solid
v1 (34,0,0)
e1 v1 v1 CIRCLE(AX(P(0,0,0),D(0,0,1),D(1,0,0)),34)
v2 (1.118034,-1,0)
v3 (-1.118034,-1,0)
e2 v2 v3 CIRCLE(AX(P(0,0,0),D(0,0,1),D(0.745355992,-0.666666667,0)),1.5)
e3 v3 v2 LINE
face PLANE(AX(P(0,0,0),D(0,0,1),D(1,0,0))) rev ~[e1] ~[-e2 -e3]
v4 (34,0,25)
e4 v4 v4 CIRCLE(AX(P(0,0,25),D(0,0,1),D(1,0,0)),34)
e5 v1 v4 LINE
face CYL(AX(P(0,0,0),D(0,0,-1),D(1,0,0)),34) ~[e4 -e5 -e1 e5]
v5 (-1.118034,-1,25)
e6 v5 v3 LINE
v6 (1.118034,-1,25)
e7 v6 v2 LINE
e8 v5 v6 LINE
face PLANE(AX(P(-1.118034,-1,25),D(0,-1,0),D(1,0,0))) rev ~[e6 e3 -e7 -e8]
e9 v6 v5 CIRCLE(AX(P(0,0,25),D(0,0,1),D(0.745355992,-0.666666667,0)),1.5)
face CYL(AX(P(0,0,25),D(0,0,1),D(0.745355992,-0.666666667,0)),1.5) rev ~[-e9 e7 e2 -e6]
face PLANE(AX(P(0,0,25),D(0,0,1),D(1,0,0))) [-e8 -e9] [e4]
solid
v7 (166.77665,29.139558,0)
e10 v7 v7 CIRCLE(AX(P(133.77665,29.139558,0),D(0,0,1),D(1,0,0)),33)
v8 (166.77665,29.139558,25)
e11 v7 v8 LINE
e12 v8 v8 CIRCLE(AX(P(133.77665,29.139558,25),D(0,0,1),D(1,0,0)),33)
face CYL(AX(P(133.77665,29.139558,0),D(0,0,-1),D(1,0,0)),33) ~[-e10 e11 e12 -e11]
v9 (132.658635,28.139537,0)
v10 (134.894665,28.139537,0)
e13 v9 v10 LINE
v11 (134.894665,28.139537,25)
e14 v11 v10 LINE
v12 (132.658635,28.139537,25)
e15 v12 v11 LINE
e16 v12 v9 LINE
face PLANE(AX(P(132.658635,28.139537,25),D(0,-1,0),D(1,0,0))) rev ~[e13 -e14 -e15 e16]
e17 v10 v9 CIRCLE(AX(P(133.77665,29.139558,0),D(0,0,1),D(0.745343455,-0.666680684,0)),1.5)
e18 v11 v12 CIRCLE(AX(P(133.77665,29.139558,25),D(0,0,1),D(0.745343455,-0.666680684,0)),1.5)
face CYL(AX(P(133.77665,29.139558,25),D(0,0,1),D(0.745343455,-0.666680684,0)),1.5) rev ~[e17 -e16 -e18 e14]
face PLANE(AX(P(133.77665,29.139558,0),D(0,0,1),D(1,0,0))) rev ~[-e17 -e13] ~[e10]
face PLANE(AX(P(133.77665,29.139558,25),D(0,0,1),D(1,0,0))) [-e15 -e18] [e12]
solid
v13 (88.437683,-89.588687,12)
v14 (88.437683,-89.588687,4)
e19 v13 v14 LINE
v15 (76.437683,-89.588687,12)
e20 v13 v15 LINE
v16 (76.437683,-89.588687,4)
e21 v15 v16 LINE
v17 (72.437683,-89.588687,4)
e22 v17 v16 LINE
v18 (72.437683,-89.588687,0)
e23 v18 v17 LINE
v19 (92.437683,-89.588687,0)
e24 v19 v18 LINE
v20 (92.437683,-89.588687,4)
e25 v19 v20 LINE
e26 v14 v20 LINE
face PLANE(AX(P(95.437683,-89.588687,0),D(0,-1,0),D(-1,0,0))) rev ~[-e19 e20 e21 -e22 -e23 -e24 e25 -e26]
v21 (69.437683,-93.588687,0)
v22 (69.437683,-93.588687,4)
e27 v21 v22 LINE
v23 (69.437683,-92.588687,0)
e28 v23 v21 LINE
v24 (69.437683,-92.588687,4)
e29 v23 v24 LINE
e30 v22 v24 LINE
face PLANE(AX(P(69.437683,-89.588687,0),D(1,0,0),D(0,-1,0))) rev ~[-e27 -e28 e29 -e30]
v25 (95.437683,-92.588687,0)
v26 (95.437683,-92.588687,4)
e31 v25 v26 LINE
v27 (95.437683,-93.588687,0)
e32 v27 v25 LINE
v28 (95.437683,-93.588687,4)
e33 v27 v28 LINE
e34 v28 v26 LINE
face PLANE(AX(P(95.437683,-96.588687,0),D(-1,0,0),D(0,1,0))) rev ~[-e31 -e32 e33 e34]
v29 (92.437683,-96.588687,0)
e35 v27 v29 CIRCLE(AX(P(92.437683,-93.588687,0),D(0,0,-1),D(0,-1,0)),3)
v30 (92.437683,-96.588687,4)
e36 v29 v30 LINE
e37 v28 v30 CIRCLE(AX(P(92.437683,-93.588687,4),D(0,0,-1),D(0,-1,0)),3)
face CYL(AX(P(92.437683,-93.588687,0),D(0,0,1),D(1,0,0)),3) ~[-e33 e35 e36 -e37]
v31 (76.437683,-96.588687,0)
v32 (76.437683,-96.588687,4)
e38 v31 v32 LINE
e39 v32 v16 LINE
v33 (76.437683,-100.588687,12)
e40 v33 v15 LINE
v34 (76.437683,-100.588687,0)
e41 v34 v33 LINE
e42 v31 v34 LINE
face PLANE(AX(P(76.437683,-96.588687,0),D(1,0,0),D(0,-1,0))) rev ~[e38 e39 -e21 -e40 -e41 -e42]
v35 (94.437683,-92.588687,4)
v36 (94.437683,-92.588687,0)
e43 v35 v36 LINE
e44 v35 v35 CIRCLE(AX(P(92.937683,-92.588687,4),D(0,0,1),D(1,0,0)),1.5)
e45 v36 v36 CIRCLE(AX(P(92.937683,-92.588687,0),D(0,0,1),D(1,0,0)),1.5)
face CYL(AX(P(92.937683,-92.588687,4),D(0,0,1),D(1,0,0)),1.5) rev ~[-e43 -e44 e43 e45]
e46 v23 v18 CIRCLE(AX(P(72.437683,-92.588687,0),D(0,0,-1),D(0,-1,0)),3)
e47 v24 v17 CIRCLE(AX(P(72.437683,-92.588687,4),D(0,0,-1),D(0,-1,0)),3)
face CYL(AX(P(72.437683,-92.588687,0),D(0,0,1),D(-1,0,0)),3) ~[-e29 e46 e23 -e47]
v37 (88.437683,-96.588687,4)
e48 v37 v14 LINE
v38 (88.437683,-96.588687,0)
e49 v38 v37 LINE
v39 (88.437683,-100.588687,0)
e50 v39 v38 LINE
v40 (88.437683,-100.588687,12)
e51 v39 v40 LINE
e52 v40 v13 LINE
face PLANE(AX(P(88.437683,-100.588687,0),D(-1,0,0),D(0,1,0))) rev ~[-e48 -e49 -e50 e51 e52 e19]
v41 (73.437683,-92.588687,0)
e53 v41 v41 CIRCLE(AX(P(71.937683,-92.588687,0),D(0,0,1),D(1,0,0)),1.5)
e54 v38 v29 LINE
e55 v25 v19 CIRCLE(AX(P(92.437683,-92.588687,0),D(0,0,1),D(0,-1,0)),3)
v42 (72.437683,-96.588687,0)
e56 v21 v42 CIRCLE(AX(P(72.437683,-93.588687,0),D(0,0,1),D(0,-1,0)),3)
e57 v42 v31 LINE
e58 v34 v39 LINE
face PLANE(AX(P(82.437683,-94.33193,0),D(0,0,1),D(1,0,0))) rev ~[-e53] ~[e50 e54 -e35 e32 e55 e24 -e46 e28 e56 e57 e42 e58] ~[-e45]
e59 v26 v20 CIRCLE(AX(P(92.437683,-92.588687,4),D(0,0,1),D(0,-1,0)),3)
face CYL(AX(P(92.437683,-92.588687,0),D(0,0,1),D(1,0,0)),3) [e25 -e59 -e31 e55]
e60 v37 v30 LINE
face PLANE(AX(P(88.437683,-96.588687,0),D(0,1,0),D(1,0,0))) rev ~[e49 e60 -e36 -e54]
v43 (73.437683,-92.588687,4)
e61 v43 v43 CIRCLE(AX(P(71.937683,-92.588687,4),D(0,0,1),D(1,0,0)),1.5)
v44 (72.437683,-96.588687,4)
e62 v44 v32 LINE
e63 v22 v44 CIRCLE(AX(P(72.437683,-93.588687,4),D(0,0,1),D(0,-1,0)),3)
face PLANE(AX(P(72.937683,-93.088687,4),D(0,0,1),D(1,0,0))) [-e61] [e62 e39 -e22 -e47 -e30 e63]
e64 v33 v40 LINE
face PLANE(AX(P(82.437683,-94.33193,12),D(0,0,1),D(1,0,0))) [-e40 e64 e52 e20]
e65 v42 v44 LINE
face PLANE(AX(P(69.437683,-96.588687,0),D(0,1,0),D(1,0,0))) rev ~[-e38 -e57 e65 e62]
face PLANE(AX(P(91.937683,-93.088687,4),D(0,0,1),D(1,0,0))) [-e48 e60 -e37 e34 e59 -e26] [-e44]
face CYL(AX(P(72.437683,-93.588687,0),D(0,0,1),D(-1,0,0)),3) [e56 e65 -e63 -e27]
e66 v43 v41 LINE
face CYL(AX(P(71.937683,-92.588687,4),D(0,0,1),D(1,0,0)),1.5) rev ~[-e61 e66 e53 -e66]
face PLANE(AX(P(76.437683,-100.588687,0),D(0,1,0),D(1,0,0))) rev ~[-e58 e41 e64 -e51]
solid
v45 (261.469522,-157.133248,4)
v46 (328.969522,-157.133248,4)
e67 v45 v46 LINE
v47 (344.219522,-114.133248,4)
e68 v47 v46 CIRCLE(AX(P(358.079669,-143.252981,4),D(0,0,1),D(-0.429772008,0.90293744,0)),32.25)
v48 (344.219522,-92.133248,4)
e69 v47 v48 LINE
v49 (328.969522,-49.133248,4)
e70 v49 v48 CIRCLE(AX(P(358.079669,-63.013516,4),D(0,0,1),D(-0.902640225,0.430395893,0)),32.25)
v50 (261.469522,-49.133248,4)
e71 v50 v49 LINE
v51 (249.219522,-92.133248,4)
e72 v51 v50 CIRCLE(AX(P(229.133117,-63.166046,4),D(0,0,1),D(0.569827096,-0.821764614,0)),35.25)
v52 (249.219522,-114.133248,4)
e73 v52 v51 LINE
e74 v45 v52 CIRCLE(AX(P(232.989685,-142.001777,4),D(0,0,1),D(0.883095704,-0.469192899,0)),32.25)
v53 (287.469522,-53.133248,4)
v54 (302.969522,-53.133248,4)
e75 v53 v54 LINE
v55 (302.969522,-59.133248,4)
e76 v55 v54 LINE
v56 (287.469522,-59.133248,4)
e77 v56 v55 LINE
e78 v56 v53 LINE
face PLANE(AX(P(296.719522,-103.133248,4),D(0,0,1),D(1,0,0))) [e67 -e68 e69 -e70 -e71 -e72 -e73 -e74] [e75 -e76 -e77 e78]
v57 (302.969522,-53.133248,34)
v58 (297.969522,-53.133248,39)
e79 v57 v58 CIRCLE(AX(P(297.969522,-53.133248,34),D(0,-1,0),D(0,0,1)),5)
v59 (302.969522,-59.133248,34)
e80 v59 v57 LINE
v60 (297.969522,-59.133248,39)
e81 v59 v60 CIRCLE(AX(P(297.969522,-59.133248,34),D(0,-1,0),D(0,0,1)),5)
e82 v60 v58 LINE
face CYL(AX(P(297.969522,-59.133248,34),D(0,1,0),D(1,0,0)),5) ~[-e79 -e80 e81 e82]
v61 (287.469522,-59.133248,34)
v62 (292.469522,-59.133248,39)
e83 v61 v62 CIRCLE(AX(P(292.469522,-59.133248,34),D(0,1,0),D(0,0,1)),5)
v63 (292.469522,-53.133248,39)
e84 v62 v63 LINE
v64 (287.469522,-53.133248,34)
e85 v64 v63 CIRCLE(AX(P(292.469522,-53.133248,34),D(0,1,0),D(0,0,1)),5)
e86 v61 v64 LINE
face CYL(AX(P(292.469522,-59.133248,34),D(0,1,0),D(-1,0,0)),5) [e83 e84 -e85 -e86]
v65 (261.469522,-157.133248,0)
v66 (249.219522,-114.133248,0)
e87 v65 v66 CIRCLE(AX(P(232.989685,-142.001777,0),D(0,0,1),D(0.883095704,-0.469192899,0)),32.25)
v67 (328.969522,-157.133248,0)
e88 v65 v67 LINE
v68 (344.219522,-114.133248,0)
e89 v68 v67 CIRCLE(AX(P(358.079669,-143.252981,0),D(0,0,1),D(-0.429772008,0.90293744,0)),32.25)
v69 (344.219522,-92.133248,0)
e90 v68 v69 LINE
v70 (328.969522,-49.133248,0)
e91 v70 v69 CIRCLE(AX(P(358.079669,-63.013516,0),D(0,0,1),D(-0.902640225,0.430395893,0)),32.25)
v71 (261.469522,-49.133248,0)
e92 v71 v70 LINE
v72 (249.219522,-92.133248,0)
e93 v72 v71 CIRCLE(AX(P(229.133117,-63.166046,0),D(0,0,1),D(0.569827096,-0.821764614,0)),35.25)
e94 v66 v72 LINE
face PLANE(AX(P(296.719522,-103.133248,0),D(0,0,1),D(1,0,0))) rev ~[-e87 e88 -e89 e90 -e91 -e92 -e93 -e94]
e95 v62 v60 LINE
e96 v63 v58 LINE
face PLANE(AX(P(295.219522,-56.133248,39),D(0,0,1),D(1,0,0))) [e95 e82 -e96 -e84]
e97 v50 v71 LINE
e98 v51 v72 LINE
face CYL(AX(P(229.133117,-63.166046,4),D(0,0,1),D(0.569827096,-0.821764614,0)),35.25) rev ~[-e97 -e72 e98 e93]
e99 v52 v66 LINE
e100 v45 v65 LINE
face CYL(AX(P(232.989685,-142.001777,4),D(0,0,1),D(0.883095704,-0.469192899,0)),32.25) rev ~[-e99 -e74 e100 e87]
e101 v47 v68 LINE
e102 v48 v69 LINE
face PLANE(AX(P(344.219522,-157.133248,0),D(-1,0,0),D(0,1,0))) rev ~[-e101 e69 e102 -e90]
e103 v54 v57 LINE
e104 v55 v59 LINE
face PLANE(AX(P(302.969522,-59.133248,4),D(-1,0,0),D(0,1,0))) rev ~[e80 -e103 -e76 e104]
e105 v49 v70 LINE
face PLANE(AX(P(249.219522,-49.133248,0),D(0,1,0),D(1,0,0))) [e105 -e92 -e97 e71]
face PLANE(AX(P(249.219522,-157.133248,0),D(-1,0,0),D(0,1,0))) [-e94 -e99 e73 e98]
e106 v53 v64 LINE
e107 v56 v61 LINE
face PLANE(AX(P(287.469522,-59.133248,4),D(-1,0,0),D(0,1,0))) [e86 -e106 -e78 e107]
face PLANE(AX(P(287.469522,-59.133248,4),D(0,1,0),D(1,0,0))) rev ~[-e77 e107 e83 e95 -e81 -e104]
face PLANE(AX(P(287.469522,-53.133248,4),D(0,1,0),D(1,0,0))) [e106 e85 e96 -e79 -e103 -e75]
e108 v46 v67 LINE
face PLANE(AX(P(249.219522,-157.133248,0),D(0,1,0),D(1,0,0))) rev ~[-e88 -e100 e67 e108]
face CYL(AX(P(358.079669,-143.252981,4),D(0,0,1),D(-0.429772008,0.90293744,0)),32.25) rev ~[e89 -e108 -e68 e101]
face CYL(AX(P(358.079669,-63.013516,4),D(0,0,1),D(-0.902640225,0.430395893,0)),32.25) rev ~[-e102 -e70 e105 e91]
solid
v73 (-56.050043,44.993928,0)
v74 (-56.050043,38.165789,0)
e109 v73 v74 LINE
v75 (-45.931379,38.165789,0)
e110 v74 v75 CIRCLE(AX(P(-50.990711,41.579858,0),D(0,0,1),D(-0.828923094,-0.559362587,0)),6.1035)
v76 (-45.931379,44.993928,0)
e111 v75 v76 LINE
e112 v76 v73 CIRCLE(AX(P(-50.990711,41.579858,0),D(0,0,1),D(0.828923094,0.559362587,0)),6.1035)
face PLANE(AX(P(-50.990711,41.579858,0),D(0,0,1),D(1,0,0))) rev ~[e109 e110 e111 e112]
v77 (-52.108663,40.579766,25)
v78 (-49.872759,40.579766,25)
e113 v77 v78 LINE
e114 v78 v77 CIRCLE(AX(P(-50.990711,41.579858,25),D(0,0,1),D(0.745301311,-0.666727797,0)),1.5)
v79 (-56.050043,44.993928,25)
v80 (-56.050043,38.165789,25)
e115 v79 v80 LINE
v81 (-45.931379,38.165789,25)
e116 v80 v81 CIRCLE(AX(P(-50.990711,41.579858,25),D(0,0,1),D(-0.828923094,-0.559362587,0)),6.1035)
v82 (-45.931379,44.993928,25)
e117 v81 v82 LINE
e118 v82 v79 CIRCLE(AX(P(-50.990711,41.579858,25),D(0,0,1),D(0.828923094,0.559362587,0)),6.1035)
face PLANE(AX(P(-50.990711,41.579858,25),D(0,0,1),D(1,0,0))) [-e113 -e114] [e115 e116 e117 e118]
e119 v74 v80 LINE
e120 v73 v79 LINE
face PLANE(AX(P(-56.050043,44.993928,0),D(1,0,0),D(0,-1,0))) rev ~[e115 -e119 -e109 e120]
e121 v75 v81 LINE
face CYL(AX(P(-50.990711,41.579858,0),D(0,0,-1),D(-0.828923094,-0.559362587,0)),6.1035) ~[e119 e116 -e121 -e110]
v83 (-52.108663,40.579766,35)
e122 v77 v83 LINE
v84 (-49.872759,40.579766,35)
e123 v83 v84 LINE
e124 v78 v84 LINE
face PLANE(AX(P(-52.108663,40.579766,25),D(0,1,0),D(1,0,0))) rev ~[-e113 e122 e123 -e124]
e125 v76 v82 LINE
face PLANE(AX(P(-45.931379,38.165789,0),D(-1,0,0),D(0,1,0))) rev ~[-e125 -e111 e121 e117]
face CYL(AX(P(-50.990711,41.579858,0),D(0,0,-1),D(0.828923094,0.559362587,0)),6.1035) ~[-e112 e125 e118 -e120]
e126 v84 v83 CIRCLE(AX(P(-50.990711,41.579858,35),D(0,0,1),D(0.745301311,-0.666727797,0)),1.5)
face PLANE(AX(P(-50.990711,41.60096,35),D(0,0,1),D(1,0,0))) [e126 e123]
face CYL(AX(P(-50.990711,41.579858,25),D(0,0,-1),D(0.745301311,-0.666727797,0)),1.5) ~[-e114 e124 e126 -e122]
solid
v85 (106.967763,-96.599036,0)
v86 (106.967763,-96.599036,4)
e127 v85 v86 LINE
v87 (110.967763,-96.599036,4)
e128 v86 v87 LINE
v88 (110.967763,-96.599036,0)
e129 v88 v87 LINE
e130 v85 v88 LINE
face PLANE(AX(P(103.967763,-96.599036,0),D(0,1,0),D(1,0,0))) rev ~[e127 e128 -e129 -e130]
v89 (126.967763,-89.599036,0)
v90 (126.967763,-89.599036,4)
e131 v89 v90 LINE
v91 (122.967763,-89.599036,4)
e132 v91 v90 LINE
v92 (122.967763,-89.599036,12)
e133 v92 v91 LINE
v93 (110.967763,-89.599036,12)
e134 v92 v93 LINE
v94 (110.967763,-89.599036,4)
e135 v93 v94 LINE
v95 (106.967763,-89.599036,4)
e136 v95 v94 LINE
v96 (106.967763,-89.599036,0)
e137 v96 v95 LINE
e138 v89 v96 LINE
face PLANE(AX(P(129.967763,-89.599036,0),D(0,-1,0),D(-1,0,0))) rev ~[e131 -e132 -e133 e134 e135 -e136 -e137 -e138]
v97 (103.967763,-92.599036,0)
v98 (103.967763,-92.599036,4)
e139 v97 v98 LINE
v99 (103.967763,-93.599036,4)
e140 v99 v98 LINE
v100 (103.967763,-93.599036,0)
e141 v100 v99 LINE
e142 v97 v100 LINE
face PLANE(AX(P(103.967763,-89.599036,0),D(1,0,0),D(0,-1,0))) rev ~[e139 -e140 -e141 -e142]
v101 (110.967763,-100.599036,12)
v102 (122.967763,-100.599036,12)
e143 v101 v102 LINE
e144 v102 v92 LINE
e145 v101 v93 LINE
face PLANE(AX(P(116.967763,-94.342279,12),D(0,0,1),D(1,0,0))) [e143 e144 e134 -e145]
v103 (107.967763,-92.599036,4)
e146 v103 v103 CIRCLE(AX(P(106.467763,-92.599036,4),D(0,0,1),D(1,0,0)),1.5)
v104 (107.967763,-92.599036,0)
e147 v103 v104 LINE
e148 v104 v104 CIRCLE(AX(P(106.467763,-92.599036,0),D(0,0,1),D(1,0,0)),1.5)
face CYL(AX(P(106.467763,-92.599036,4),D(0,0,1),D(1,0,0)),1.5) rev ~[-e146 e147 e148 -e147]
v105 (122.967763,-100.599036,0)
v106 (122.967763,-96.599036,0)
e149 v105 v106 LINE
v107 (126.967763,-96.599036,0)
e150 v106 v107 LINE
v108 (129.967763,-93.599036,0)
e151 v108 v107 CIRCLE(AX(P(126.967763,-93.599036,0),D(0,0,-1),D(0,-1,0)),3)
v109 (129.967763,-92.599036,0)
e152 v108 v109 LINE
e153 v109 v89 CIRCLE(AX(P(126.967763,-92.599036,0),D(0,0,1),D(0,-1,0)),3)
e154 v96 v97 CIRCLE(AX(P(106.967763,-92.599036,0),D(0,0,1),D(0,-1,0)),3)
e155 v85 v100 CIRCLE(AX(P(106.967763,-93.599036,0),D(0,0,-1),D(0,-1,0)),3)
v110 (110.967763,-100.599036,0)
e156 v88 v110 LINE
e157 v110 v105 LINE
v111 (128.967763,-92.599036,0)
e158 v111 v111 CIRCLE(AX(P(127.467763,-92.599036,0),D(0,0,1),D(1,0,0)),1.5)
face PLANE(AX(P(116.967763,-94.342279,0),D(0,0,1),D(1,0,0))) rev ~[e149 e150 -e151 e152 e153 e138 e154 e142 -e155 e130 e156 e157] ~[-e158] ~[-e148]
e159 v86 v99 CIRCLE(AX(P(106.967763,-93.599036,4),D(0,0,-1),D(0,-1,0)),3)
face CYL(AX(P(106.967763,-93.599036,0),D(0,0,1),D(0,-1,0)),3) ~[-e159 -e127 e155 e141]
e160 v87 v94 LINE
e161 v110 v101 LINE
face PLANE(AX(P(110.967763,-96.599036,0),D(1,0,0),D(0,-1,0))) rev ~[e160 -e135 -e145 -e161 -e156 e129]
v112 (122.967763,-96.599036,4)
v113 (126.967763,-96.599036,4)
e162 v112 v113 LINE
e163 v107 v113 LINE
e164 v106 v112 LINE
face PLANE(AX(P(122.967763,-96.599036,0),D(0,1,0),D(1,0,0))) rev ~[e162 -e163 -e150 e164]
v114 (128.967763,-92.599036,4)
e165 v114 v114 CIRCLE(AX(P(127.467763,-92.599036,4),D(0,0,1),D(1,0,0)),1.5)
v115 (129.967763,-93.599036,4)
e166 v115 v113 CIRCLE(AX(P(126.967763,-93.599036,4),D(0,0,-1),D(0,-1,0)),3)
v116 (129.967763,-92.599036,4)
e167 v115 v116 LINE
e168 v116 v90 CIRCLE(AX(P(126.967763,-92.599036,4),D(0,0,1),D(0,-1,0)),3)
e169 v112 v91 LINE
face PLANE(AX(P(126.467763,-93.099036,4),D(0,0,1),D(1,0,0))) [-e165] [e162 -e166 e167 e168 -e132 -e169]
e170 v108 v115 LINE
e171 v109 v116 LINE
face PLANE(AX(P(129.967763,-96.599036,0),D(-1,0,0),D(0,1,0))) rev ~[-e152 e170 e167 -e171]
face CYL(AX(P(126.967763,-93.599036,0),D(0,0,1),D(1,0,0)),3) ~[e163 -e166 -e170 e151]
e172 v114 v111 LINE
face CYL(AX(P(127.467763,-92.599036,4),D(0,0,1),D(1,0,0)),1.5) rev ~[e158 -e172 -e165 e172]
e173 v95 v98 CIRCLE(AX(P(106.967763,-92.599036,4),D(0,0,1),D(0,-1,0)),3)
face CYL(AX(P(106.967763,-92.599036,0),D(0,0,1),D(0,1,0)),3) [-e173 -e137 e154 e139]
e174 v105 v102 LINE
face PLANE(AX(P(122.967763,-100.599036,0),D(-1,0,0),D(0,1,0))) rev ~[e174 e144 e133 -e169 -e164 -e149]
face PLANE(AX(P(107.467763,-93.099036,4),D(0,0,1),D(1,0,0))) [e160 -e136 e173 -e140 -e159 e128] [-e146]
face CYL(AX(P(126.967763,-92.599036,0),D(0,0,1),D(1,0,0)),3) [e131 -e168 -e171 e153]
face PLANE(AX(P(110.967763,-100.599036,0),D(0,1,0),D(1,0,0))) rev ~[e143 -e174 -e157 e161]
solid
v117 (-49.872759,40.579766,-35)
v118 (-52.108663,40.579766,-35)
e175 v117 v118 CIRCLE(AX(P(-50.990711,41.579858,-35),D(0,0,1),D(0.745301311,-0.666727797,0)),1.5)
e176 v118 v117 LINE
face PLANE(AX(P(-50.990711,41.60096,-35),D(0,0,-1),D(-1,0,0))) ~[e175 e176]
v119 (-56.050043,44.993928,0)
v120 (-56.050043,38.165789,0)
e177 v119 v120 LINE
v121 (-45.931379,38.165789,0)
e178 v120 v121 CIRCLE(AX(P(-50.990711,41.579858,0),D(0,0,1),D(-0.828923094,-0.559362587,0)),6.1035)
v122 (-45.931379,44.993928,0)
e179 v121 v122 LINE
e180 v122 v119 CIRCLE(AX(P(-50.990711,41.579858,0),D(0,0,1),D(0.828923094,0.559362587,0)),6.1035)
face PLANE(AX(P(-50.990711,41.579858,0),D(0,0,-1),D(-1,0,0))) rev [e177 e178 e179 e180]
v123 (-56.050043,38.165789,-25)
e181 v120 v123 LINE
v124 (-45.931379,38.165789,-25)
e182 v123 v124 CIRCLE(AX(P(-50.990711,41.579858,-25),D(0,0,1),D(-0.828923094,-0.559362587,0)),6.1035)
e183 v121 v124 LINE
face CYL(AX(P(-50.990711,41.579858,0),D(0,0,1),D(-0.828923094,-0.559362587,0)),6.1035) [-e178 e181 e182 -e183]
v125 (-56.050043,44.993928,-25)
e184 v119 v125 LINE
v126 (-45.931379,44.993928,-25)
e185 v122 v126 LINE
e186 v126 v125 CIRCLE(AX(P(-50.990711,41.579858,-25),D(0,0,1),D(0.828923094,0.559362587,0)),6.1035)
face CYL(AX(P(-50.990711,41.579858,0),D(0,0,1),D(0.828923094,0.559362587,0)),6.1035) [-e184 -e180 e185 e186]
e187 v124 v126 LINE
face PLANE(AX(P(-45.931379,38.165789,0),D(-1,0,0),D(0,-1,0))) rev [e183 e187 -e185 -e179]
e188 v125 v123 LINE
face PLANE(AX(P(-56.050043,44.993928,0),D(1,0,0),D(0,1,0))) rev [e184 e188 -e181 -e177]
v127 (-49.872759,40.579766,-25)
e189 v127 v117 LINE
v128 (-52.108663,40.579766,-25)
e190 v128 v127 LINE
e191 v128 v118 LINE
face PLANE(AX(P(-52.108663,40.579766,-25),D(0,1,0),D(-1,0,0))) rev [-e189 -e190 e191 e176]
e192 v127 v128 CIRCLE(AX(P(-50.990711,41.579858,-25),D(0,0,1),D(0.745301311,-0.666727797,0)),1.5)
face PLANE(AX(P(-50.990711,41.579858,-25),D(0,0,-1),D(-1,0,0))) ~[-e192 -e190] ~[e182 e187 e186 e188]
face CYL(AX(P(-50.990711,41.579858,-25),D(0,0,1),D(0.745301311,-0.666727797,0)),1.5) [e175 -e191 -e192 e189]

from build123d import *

# Parameters (mm, degrees)
F0_R      = 34
F1_DEPTH  = 25
F4_DEPTH  = 44
F5_DEPTH  = 25
F7_DEPTH  = 10
F8_R      = 33
F9_DEPTH  = 25
F11_DEPTH = 28.1
F13_W     = 95
F13_H     = 108
F14_DEPTH = 4
F16_DEPTH = 25
F17_W     = 15.5
F17_H     = 6
F18_DEPTH = 35
F19_R     = 5
F21_DEPTH = 12
F22_W     = 7
F22_H     = 7
F23_DEPTH = 8
F24_R     = 3
F26_R     = 1.5
F25_R     = 1.5
F27_DEPTH = 25
F29_DEPTH = 12
F30_W     = 7
F30_H     = 7
F31_DEPTH = 8
F32_R     = 3
F33_R     = 3
F34_R     = 1.5
F35_R     = 1.5
F36_DEPTH = 25


with BuildPart() as f1:
    # F0 (on Top) → F1 (new body)
    with BuildSketch(Plane.XY):
        Circle(F0_R)
    extrude(amount=F1_DEPTH)

    # F3 (on face) → F4 (cut)
    with BuildSketch(Plane.XY.offset(25)):
        with BuildLine():
            Line((0, -1), (1.1180339887, -1))
            ThreePointArc((1.1180339887, -1), (0, 1.5), (-1.1180339887, -1))
            Line((-1.1180339887, -1), (0, -1))
        make_face()
    extrude(amount=-F4_DEPTH, mode=Mode.SUBTRACT)


with BuildPart() as f5:
    # F2 (on Top) → F5 (new body)
    with BuildSketch(Plane.XY):
        with BuildLine():
            Line((-56.0500432012, 44.9939276846), (-56.0500432012, 38.1657885869))
            ThreePointArc((-56.0500432012, 38.1657885869), (-50.9907110945, 35.4763581357), (-45.9313789879, 38.1657885869))
            Line((-45.9313789879, 38.1657885869), (-45.9313789879, 44.9939276846))
            ThreePointArc((-45.9313789879, 44.9939276846), (-50.9907110945, 47.6833581357), (-56.0500432012, 44.9939276846))
        make_face()
    extrude(amount=F5_DEPTH)

    # F6 (on face) → F7 (join)
    with BuildSketch(Plane.XY.offset(25)):
        with BuildLine():
            Line((-51.0072966267, 40.5797664396), (-49.872759128, 40.5797664396))
            ThreePointArc((-49.872759128, 40.5797664396), (-50.9907110945, 43.0798581357), (-52.108663061, 40.5797664396))
            Line((-52.108663061, 40.5797664396), (-51.0072966267, 40.5797664396))
        make_face()
    extrude(amount=F7_DEPTH)


with BuildPart() as f9:
    # F8 (on Top) → F9 (new body)
    with BuildSketch(Plane.XY):
        with Locations((133.7766498327, 29.1395578533)):
            Circle(F8_R)
    extrude(amount=F9_DEPTH)

    # F10 (on face) → F11 (cut)
    with BuildSketch(Plane.XY.offset(25)):
        with BuildLine():
            Line((133.7687078238, 28.139536828), (134.8946650155, 28.139536828))
            ThreePointArc((134.8946650155, 28.139536828), (133.7766498327, 30.6395578533), (132.6586346499, 28.139536828))
            Line((132.6586346499, 28.139536828), (133.7687078238, 28.139536828))
        make_face()
    extrude(amount=-F11_DEPTH, mode=Mode.SUBTRACT)


with BuildPart() as f12_1:
    # F12: instance of F5
    add(f5.part.mirror(Plane.XY))


with BuildPart() as f14:
    # F13 (on Top) → F14 (new body)
    with BuildSketch(Plane.XY):
        with Locations((296.7195218801, -103.1332481652)):
            Rectangle(F13_W, F13_H)
    extrude(amount=F14_DEPTH)

    # F15 (on face) → F16 (cut)
    with BuildSketch(Plane.XY.offset(4)):
        with BuildLine():
            Line((261.4695218801, -49.1332481652), (249.2195218801, -49.1332481652))
            Line((249.2195218801, -49.1332481652), (249.2195218801, -92.1332481652))
            ThreePointArc((249.2195218801, -92.1332481652), (263.0342636127, -72.823930403), (261.4695218801, -49.1332481652))
        make_face()
        with BuildLine():
            Line((344.2195218801, -49.1332481652), (328.9695218801, -49.1332481652))
            ThreePointArc((328.9695218801, -49.1332481652), (327.6845782047, -73.7931700502), (344.2195218801, -92.1332481652))
            Line((344.2195218801, -92.1332481652), (344.2195218801, -49.1332481652))
        make_face()
        with BuildLine():
            ThreePointArc((344.2195218801, -114.1332481652), (327.6845782047, -132.4733262803), (328.9695218801, -157.1332481652))
            Line((328.9695218801, -157.1332481652), (344.2195218801, -157.1332481652))
            Line((344.2195218801, -157.1332481652), (344.2195218801, -114.1332481652))
        make_face()
        with BuildLine():
            ThreePointArc((261.4695218801, -157.1332481652), (264.005628305, -133.1658399396), (249.2195218801, -114.1332481652))
            Line((249.2195218801, -114.1332481652), (249.2195218801, -157.1332481652))
            Line((249.2195218801, -157.1332481652), (261.4695218801, -157.1332481652))
        make_face()
    extrude(amount=-F16_DEPTH, mode=Mode.SUBTRACT)

    # F17 (on face) → F18 (join)
    with BuildSketch(Plane.XY.offset(4)):
        with Locations((295.2195218801, -56.1332481652)):
            Rectangle(F17_W, F17_H)
    extrude(amount=F18_DEPTH)

    # F19
    f19_edges = [f14.edges().sort_by_distance(p)[0] for p in [
        (287.469522, -56.133248, 39),
        (302.969522, -56.133248, 39),
    ]]
    fillet(f19_edges, radius=F19_R)


with BuildPart() as f21:
    # F20 (on Top) → F21 (new body)
    with BuildSketch(Plane.XY):
        Polygon((76.4376826286, -96.5886867642), (76.4376826286, -100.5886867642), (88.4376826286, -100.5886867642), (88.4376826286, -96.5886867642), (95.4376826286, -96.5886867642), (95.4376826286, -89.5886867642), (69.4376826286, -89.5886867642), (69.4376826286, -96.5886867642), align=None)
    extrude(amount=F21_DEPTH)

    # F22 (on face) → F23 (cut)
    with BuildSketch(Plane.XY.offset(12)):
        with Locations((91.9376826286, -93.0886867642)):
            Rectangle(F22_W, F22_H)
        with Locations((72.9376826286, -93.0886867642)):
            Rectangle(F22_W, F22_H)
    extrude(amount=-F23_DEPTH, mode=Mode.SUBTRACT)

    # F24
    f24_edges = [f21.edges().sort_by_distance(p)[0] for p in [
        (95.437683, -89.588687, 2),
        (95.437683, -96.588687, 2),
        (69.437683, -96.588687, 2),
        (69.437683, -89.588687, 2),
    ]]
    fillet(f24_edges, radius=F24_R)

    # F26 (on face) + F25 (on face) → F27 (cut)
    with BuildSketch(Plane.XY.offset(4)):
        with Locations((71.9376826286, -92.5886867642)):
            Circle(F26_R)
    with BuildSketch(Plane.XY.offset(4)):
        with Locations((92.9376826286, -92.5886867642)):
            Circle(F25_R)
    extrude(amount=-F27_DEPTH, mode=Mode.SUBTRACT)


with BuildPart() as f29:
    # F28 (on Top) → F29 (new body)
    with BuildSketch(Plane.XY):
        Polygon((110.9677634835, -96.5990356207), (110.9677634835, -100.5990356207), (122.9677634835, -100.5990356207), (122.9677634835, -96.5990356207), (129.9677634835, -96.5990356207), (129.9677634835, -89.5990356207), (103.9677634835, -89.5990356207), (103.9677634835, -96.5990356207), align=None)
    extrude(amount=F29_DEPTH)

    # F30 (on face) → F31 (cut)
    with BuildSketch(Plane.XY.offset(12)):
        with Locations((126.4677634835, -93.0990356207)):
            Rectangle(F30_W, F30_H)
        with Locations((107.4677634835, -93.0990356207)):
            Rectangle(F30_W, F30_H)
    extrude(amount=-F31_DEPTH, mode=Mode.SUBTRACT)

    # F32
    f32_edges = [f29.edges().sort_by_distance(p)[0] for p in [
        (129.967763, -89.599036, 2),
        (129.967763, -96.599036, 2),
    ]]
    fillet(f32_edges, radius=F32_R)

    # F33
    f33_edges = [f29.edges().sort_by_distance(p)[0] for p in [
        (103.967763, -96.599036, 2),
        (103.967763, -89.599036, 2),
    ]]
    fillet(f33_edges, radius=F33_R)

    # F34 (on face) + F35 (on face) → F36 (cut)
    with BuildSketch(Plane.XY.offset(4)):
        with Locations((106.4677634835, -92.5990356207)):
            Circle(F34_R)
    with BuildSketch(Plane.XY.offset(4)):
        with Locations((127.4677634835, -92.5990356207)):
            Circle(F35_R)
    extrude(amount=-F36_DEPTH, mode=Mode.SUBTRACT)


solid = Compound([f1.part, f5.part, f9.part, f12_1.part, f14.part, f21.part, f29.part])
